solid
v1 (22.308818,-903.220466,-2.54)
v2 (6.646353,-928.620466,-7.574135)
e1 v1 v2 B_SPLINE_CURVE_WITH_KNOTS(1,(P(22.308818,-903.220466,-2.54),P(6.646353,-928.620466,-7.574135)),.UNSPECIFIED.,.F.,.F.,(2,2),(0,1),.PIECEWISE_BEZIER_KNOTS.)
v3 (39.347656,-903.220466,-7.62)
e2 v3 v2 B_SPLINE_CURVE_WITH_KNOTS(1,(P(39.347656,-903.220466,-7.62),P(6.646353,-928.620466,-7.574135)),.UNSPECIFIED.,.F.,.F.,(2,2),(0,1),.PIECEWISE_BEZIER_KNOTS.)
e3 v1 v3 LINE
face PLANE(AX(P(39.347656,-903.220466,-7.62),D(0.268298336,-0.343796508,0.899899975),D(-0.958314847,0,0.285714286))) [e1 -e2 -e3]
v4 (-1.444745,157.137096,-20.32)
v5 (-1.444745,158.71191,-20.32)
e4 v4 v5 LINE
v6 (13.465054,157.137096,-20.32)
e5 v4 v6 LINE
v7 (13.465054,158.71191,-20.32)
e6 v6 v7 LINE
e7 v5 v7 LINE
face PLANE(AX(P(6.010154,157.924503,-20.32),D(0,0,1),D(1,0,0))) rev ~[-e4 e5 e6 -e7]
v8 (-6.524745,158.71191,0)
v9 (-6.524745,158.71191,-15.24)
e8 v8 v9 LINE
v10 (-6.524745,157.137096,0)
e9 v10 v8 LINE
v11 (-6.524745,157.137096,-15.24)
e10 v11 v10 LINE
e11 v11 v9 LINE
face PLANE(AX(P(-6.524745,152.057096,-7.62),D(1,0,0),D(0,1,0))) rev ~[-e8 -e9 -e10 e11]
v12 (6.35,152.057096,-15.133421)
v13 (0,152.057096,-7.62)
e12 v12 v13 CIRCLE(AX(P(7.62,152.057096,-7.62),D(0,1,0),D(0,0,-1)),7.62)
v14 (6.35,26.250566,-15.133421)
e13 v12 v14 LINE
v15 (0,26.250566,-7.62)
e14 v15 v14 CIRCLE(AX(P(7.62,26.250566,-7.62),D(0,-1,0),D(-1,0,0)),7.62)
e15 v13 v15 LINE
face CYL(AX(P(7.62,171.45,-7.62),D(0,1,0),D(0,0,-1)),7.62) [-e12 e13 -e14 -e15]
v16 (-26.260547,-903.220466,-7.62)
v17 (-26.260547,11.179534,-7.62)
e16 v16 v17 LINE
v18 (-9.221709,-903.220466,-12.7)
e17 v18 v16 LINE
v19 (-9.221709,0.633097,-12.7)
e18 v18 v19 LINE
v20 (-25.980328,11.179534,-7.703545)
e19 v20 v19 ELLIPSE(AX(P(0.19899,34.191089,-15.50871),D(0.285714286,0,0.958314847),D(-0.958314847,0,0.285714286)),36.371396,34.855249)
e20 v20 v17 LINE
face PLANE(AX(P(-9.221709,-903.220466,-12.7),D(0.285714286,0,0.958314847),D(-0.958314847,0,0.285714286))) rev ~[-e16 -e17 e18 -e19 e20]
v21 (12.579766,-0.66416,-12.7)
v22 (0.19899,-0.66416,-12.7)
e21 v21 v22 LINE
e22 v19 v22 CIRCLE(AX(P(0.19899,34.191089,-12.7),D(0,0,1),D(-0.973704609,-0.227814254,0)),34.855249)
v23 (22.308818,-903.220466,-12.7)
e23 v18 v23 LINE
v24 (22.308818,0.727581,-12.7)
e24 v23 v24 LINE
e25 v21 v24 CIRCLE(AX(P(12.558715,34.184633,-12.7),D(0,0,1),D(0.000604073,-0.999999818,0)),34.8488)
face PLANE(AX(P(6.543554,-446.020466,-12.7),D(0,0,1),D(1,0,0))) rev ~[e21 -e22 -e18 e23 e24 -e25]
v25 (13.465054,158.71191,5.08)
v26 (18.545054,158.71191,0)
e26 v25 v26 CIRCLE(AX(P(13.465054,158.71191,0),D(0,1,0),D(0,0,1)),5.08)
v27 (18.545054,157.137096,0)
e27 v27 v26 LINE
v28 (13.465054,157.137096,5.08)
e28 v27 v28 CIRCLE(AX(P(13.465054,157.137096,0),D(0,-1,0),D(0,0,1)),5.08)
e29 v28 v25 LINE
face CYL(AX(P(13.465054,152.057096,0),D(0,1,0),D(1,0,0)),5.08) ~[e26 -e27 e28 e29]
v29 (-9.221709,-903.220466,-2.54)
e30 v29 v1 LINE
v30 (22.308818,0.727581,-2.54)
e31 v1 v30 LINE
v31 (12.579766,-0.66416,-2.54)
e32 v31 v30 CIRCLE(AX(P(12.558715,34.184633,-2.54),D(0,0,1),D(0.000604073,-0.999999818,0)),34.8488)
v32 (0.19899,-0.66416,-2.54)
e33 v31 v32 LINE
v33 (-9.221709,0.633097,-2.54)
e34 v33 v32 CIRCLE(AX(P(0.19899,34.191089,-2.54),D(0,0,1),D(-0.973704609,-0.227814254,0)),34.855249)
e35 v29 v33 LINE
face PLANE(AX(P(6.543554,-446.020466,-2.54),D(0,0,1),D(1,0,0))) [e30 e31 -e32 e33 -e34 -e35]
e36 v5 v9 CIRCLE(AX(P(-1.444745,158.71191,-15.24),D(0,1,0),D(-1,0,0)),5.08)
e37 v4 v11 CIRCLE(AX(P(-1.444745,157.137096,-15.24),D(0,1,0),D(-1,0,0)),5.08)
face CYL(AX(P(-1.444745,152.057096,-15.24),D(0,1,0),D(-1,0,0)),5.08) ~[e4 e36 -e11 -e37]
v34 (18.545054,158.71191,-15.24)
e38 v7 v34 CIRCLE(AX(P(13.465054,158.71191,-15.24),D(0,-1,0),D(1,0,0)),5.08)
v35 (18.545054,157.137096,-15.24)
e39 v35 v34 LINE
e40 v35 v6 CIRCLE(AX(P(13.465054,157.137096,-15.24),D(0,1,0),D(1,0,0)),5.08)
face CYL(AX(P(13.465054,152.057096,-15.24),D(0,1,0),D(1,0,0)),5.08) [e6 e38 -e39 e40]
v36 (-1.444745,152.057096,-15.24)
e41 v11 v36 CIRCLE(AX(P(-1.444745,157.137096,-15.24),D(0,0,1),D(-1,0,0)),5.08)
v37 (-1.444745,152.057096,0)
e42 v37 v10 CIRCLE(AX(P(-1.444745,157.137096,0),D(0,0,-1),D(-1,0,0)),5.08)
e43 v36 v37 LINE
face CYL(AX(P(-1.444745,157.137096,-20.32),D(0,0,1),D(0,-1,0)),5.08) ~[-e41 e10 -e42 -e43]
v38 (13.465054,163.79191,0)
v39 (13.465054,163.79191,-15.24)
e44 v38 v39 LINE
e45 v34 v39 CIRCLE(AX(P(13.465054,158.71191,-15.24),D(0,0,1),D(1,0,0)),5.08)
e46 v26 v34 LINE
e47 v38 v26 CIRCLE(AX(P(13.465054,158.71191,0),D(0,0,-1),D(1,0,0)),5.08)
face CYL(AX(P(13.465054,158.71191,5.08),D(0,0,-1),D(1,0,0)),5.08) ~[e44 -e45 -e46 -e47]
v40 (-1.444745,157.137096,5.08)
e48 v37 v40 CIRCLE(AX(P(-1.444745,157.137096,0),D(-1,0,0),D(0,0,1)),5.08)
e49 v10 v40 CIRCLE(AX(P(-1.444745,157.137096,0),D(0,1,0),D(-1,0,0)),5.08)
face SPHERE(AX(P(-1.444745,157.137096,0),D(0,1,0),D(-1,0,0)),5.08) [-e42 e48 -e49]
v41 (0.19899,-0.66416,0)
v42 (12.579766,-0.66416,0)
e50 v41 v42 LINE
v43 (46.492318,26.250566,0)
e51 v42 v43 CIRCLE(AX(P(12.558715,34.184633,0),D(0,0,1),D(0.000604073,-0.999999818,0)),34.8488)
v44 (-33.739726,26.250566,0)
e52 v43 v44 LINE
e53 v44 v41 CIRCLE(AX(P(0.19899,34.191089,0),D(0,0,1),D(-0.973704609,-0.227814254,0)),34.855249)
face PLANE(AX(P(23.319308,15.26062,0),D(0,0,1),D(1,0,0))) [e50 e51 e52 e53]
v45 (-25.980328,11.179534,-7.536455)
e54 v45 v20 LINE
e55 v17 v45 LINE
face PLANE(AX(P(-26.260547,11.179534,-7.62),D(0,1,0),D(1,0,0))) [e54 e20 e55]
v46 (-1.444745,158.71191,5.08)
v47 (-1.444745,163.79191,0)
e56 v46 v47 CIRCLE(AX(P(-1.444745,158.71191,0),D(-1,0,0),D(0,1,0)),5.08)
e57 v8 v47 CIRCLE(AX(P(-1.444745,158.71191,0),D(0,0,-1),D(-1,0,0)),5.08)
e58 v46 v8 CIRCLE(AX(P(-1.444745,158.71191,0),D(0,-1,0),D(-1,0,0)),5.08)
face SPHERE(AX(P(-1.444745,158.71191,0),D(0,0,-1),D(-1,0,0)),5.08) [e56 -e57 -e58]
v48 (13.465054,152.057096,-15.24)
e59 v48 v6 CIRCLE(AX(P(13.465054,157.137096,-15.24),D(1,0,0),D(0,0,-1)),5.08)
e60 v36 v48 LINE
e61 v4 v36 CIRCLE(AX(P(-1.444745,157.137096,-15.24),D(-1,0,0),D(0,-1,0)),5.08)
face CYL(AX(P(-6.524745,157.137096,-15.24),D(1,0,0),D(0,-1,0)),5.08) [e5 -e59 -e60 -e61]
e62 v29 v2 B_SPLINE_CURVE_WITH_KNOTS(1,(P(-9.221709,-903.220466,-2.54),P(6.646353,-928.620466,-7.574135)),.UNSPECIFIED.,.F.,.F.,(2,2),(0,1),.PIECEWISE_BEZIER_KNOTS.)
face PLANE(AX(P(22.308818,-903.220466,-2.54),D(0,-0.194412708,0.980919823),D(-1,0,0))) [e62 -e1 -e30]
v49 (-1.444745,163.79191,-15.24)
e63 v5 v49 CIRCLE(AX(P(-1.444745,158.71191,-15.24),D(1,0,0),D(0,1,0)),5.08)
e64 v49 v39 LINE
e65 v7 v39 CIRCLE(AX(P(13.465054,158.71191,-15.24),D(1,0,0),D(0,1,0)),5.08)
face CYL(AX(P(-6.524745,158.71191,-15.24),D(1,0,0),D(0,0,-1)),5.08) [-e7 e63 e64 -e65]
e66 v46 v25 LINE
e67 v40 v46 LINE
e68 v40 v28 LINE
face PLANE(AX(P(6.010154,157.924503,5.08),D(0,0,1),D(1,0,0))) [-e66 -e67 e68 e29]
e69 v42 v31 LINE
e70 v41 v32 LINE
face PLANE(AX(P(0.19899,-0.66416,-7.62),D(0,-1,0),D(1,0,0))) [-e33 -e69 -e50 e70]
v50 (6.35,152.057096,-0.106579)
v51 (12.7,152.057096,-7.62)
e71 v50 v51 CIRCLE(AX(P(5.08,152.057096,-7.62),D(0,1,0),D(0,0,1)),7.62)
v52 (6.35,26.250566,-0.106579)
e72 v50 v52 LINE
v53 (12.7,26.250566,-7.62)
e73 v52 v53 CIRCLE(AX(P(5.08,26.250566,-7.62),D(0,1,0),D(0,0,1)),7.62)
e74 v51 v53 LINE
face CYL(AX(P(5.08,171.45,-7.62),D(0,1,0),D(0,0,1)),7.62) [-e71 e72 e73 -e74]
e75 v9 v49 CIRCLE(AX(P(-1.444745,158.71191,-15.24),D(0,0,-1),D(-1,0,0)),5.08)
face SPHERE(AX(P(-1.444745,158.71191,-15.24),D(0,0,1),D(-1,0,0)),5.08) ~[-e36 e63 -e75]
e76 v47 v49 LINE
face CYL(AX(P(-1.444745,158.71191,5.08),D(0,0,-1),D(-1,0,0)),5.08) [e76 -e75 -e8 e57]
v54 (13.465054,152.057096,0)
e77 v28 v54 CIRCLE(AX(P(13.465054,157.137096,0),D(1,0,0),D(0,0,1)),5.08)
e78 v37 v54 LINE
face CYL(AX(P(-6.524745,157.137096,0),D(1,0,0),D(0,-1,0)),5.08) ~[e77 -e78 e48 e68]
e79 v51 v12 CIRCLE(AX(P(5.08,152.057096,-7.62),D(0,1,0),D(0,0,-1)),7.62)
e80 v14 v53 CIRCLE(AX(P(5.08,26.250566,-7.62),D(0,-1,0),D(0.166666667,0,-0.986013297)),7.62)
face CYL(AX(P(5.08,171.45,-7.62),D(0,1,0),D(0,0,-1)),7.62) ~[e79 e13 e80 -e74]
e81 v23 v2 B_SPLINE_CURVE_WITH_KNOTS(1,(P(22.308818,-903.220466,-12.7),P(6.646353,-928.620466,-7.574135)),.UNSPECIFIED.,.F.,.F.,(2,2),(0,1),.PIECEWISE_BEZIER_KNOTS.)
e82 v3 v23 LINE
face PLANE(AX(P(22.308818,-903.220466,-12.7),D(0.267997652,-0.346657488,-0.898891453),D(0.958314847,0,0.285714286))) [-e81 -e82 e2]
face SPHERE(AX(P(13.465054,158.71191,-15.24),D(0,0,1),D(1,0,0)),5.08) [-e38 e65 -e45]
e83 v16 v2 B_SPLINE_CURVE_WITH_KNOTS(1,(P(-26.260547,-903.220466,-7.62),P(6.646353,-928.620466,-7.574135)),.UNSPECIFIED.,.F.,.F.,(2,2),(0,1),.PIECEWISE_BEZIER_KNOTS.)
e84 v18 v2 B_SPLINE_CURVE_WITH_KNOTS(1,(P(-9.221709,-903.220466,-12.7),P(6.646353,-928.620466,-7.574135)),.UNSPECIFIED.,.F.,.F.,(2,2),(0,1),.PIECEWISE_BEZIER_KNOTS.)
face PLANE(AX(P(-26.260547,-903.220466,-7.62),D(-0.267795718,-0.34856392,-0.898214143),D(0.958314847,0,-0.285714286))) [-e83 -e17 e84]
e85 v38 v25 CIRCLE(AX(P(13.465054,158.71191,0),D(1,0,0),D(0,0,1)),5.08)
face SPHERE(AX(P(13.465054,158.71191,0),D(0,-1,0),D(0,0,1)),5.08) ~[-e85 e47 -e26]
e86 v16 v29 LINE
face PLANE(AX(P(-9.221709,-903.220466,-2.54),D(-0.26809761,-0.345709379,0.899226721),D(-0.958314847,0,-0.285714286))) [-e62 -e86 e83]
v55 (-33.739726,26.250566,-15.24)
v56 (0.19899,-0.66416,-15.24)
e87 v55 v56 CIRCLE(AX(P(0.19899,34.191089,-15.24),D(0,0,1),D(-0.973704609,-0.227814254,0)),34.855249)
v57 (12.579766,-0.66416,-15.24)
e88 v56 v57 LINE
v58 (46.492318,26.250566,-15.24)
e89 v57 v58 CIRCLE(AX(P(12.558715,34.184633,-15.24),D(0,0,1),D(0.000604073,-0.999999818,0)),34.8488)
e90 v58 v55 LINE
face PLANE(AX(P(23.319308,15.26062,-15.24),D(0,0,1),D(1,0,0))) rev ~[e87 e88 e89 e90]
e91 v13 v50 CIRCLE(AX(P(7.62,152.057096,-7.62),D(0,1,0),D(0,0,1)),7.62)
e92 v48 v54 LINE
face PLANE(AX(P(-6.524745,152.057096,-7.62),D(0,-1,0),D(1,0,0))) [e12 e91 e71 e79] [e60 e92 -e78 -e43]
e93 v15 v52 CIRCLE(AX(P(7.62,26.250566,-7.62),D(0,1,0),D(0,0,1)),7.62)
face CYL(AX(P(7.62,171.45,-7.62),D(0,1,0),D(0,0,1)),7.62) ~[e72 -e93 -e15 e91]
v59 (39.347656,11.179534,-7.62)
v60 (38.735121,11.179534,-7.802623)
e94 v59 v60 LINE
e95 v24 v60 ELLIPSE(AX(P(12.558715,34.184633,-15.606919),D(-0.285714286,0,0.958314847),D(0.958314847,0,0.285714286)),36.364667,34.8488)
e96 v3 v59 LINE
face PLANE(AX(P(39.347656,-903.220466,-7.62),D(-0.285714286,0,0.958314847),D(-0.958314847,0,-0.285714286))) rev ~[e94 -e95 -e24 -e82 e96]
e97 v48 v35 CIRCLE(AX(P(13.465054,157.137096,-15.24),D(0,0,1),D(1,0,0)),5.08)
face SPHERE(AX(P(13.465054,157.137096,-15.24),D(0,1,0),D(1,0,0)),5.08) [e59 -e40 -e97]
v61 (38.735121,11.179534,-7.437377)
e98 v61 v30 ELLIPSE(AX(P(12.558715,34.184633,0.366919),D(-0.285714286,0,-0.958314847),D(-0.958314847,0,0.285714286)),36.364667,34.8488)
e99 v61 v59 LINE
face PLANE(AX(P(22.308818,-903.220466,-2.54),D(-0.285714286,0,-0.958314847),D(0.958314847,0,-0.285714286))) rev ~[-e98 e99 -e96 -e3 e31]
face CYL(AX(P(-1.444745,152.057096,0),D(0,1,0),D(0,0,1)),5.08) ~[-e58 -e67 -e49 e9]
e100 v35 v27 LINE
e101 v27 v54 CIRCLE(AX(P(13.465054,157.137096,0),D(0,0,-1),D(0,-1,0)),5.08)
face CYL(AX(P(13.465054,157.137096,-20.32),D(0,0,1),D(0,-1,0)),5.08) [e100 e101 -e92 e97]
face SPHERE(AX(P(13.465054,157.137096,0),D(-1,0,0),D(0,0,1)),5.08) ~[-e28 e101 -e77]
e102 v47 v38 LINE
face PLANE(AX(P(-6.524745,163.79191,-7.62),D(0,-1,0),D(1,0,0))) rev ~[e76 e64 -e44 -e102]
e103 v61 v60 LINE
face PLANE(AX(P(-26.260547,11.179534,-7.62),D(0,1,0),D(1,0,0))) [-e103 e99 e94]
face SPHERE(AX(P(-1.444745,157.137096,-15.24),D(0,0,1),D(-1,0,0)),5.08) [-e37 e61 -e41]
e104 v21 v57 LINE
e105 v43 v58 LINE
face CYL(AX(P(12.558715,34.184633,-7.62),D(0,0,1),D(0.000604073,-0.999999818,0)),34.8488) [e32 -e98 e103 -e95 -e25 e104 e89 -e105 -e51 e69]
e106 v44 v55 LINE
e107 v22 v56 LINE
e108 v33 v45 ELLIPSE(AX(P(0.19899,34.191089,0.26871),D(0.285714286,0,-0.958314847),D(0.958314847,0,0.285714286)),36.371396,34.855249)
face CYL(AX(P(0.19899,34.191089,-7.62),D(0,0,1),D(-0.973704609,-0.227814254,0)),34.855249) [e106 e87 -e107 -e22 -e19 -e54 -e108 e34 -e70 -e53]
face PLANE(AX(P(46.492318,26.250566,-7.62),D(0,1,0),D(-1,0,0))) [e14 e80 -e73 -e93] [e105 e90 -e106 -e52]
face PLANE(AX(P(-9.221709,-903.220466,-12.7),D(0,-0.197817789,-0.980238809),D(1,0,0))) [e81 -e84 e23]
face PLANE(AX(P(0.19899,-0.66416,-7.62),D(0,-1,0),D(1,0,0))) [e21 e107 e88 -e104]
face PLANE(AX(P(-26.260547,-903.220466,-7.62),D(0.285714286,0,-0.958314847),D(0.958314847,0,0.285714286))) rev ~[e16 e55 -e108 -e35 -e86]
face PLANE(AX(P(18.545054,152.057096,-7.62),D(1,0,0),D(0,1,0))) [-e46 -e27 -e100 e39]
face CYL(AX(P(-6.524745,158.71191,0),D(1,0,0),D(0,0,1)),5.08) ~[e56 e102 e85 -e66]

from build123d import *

# Parameters (mm, degrees)
F0_W          = 152.4
F0_H          = 15.24
F1_DEPTH      = 12.7
F2_T1_DEPTH   = 190.5
F4_W          = 25.0697992742
F4_H          = 11.7348134518
F5_DEPTH      = 12.7
F5_DEPTH_BACK = 12.7
F7_DEPTH      = 7.62
F7_DEPTH_BACK = 7.62
F8_W          = 65.6082034111
F8_H          = 914.4
F9_DEPTH      = 5.08
F9_DEPTH_BACK = 5.08
F11_DEPTH     = 914.4
F12_DEPTH     = 12.7
F16_R         = 5.08


# Not quite as in the source:
# - a fillet or chamfer that OpenCascade refuses, or shapes differently, is made with other operations: its cross-section is extruded or revolved along the edge and cut away or added


with BuildPart() as f1:
    # F0 (on Right) → F1 (new body)
    with BuildSketch(Plane.YZ):
        with Locations((76.2, -7.62)):
            Rectangle(F0_W, F0_H)
    extrude(amount=F1_DEPTH)

    # F2: fillet of radius 7.62 on 4 edges, made by hand

    # F2_s2 → F2_t1 (cut)
    with BuildSketch(Plane.XZ.offset(-171.45)):
        with BuildLine():
            ThreePointArc((7.62, 0), (2.2318463274, -2.2318463274), (0, -7.62))
            Line((0, -7.62), (0, 0))
            Line((0, 0), (7.62, 0))
        make_face()
        with BuildLine():
            ThreePointArc((7.62, -15.24), (2.2318463274, -13.0081536726), (0, -7.62))
            Line((0, -7.62), (0, -15.24))
            Line((0, -15.24), (7.62, -15.24))
        make_face()
        with BuildLine():
            ThreePointArc((5.08, 0), (10.4681536726, -2.2318463274), (12.7, -7.62))
            Line((12.7, -7.62), (12.7, 0))
            Line((12.7, 0), (5.08, 0))
        make_face()
        with BuildLine():
            ThreePointArc((5.08, -15.24), (10.4681536726, -13.0081536726), (12.7, -7.62))
            Line((12.7, -7.62), (12.7, -15.24))
            Line((12.7, -15.24), (5.08, -15.24))
        make_face()
    extrude(amount=F2_T1_DEPTH, mode=Mode.SUBTRACT)

    # F4 (on offset) → F5 (join, two sides)
    with BuildSketch(Plane.XY.offset(-7.62)) as f5_sk:
        with Locations((6.0101542622, 157.924503088)):
            Rectangle(F4_W, F4_H)
    extrude(amount=F5_DEPTH)
    extrude(f5_sk.sketch, amount=-F5_DEPTH_BACK)

    # F6 (on offset) → F7 (join, two sides)
    with BuildSketch(Plane.XY.offset(-7.62)) as f7_sk:
        with BuildLine():
            Line((6.3893780661, -0.6641601572), (12.5797659928, -0.6641601572))
            ThreePointArc((12.5797659928, -0.6641601572), (34.2227463889, 6.8879561013), (46.4923181534, 26.2505661817))
            Line((46.4923181534, 26.2505661817), (6.3893780661, 26.2505661817))
            Line((6.3893780661, 26.2505661817), (6.3893780661, -0.6641601572))
        make_face()
        with BuildLine():
            Line((0.1989901393, -0.6641601572), (6.3893780661, -0.6641601572))
            Line((6.3893780661, -0.6641601572), (6.3893780661, 26.2505661817))
            Line((6.3893780661, 26.2505661817), (-33.7397263339, 26.2505661817))
            ThreePointArc((-33.7397263339, 26.2505661817), (-21.4587969692, 6.8812254508), (0.1989901393, -0.6641601572))
        make_face()
    extrude(amount=F7_DEPTH)
    extrude(f7_sk.sketch, amount=-F7_DEPTH_BACK)

    # F8 (on offset) → F9 (join, two sides)
    with BuildSketch(Plane.XY.offset(-7.62)) as f9_sk:
        with Locations((6.5435543656, -446.0204662129)):
            Rectangle(F8_W, F8_H)
    extrude(amount=-F9_DEPTH)
    extrude(f9_sk.sketch, amount=F9_DEPTH_BACK)

    # F10 (on face) → F11 (cut)
    with BuildSketch(Plane.XZ.offset(903.2204662129)):
        Polygon((-26.2605473399, -2.54), (-26.2605473399, -7.62), (-9.2217093514, -2.54), align=None)
        Polygon((-9.2217093514, -12.7), (-26.2605473399, -7.62), (-26.2605473399, -12.7), align=None)
        Polygon((39.3476560712, -7.62), (22.3088180826, -12.7), (39.3476560712, -12.7), align=None)
        Polygon((39.3476560712, -2.54), (22.3088180826, -2.54), (39.3476560712, -7.62), align=None)
    extrude(amount=-F11_DEPTH, mode=Mode.SUBTRACT)

    # F12 (add): a face of the model
    f12_faces = [f1.faces().sort_by_distance(p)[0] for p in [
        (6.3771735992, 14.5847815456, 0),
    ]]
    extrude(f12_faces, amount=-F12_DEPTH)

    # F9_face (on face) → F15 section 0
    with BuildSketch(Plane(origin=(6.5435543656, -903.2204662129, -7.62), x_dir=(1, 0, 0), z_dir=(0, -1, 0)), mode=Mode.PRIVATE) as f15_s0:
        Polygon((-32.8041017056, 0), (-15.765263717, -5.08), (15.765263717, -5.08), (32.8041017056, 0), (15.765263717, 5.08), (-15.765263717, 5.08), align=None)
    loft([f15_s0.sketch, Vertex(6.6463528201, -928.6204662129, -7.5741349719)])

    # F16
    f16_edges = [f1.edges().sort_by_distance(p)[0] for p in [
        (-6.524745, 163.79191, -7.62),
        (-6.524745, 157.924503, 5.08),
        (-6.524745, 152.057096, -7.62),
        (-6.524745, 157.924503, -20.32),
        (6.010154, 152.057096, 5.08),
        (18.545054, 157.924503, 5.08),
        (6.010154, 163.79191, 5.08),
        (18.545054, 163.79191, -7.62),
        (18.545054, 157.924503, -20.32),
        (18.545054, 152.057096, -7.62),
        (6.010154, 152.057096, -20.32),
        (6.010154, 163.79191, -20.32),
    ]]
    fillet(f16_edges, radius=F16_R)


solid = f1.part
